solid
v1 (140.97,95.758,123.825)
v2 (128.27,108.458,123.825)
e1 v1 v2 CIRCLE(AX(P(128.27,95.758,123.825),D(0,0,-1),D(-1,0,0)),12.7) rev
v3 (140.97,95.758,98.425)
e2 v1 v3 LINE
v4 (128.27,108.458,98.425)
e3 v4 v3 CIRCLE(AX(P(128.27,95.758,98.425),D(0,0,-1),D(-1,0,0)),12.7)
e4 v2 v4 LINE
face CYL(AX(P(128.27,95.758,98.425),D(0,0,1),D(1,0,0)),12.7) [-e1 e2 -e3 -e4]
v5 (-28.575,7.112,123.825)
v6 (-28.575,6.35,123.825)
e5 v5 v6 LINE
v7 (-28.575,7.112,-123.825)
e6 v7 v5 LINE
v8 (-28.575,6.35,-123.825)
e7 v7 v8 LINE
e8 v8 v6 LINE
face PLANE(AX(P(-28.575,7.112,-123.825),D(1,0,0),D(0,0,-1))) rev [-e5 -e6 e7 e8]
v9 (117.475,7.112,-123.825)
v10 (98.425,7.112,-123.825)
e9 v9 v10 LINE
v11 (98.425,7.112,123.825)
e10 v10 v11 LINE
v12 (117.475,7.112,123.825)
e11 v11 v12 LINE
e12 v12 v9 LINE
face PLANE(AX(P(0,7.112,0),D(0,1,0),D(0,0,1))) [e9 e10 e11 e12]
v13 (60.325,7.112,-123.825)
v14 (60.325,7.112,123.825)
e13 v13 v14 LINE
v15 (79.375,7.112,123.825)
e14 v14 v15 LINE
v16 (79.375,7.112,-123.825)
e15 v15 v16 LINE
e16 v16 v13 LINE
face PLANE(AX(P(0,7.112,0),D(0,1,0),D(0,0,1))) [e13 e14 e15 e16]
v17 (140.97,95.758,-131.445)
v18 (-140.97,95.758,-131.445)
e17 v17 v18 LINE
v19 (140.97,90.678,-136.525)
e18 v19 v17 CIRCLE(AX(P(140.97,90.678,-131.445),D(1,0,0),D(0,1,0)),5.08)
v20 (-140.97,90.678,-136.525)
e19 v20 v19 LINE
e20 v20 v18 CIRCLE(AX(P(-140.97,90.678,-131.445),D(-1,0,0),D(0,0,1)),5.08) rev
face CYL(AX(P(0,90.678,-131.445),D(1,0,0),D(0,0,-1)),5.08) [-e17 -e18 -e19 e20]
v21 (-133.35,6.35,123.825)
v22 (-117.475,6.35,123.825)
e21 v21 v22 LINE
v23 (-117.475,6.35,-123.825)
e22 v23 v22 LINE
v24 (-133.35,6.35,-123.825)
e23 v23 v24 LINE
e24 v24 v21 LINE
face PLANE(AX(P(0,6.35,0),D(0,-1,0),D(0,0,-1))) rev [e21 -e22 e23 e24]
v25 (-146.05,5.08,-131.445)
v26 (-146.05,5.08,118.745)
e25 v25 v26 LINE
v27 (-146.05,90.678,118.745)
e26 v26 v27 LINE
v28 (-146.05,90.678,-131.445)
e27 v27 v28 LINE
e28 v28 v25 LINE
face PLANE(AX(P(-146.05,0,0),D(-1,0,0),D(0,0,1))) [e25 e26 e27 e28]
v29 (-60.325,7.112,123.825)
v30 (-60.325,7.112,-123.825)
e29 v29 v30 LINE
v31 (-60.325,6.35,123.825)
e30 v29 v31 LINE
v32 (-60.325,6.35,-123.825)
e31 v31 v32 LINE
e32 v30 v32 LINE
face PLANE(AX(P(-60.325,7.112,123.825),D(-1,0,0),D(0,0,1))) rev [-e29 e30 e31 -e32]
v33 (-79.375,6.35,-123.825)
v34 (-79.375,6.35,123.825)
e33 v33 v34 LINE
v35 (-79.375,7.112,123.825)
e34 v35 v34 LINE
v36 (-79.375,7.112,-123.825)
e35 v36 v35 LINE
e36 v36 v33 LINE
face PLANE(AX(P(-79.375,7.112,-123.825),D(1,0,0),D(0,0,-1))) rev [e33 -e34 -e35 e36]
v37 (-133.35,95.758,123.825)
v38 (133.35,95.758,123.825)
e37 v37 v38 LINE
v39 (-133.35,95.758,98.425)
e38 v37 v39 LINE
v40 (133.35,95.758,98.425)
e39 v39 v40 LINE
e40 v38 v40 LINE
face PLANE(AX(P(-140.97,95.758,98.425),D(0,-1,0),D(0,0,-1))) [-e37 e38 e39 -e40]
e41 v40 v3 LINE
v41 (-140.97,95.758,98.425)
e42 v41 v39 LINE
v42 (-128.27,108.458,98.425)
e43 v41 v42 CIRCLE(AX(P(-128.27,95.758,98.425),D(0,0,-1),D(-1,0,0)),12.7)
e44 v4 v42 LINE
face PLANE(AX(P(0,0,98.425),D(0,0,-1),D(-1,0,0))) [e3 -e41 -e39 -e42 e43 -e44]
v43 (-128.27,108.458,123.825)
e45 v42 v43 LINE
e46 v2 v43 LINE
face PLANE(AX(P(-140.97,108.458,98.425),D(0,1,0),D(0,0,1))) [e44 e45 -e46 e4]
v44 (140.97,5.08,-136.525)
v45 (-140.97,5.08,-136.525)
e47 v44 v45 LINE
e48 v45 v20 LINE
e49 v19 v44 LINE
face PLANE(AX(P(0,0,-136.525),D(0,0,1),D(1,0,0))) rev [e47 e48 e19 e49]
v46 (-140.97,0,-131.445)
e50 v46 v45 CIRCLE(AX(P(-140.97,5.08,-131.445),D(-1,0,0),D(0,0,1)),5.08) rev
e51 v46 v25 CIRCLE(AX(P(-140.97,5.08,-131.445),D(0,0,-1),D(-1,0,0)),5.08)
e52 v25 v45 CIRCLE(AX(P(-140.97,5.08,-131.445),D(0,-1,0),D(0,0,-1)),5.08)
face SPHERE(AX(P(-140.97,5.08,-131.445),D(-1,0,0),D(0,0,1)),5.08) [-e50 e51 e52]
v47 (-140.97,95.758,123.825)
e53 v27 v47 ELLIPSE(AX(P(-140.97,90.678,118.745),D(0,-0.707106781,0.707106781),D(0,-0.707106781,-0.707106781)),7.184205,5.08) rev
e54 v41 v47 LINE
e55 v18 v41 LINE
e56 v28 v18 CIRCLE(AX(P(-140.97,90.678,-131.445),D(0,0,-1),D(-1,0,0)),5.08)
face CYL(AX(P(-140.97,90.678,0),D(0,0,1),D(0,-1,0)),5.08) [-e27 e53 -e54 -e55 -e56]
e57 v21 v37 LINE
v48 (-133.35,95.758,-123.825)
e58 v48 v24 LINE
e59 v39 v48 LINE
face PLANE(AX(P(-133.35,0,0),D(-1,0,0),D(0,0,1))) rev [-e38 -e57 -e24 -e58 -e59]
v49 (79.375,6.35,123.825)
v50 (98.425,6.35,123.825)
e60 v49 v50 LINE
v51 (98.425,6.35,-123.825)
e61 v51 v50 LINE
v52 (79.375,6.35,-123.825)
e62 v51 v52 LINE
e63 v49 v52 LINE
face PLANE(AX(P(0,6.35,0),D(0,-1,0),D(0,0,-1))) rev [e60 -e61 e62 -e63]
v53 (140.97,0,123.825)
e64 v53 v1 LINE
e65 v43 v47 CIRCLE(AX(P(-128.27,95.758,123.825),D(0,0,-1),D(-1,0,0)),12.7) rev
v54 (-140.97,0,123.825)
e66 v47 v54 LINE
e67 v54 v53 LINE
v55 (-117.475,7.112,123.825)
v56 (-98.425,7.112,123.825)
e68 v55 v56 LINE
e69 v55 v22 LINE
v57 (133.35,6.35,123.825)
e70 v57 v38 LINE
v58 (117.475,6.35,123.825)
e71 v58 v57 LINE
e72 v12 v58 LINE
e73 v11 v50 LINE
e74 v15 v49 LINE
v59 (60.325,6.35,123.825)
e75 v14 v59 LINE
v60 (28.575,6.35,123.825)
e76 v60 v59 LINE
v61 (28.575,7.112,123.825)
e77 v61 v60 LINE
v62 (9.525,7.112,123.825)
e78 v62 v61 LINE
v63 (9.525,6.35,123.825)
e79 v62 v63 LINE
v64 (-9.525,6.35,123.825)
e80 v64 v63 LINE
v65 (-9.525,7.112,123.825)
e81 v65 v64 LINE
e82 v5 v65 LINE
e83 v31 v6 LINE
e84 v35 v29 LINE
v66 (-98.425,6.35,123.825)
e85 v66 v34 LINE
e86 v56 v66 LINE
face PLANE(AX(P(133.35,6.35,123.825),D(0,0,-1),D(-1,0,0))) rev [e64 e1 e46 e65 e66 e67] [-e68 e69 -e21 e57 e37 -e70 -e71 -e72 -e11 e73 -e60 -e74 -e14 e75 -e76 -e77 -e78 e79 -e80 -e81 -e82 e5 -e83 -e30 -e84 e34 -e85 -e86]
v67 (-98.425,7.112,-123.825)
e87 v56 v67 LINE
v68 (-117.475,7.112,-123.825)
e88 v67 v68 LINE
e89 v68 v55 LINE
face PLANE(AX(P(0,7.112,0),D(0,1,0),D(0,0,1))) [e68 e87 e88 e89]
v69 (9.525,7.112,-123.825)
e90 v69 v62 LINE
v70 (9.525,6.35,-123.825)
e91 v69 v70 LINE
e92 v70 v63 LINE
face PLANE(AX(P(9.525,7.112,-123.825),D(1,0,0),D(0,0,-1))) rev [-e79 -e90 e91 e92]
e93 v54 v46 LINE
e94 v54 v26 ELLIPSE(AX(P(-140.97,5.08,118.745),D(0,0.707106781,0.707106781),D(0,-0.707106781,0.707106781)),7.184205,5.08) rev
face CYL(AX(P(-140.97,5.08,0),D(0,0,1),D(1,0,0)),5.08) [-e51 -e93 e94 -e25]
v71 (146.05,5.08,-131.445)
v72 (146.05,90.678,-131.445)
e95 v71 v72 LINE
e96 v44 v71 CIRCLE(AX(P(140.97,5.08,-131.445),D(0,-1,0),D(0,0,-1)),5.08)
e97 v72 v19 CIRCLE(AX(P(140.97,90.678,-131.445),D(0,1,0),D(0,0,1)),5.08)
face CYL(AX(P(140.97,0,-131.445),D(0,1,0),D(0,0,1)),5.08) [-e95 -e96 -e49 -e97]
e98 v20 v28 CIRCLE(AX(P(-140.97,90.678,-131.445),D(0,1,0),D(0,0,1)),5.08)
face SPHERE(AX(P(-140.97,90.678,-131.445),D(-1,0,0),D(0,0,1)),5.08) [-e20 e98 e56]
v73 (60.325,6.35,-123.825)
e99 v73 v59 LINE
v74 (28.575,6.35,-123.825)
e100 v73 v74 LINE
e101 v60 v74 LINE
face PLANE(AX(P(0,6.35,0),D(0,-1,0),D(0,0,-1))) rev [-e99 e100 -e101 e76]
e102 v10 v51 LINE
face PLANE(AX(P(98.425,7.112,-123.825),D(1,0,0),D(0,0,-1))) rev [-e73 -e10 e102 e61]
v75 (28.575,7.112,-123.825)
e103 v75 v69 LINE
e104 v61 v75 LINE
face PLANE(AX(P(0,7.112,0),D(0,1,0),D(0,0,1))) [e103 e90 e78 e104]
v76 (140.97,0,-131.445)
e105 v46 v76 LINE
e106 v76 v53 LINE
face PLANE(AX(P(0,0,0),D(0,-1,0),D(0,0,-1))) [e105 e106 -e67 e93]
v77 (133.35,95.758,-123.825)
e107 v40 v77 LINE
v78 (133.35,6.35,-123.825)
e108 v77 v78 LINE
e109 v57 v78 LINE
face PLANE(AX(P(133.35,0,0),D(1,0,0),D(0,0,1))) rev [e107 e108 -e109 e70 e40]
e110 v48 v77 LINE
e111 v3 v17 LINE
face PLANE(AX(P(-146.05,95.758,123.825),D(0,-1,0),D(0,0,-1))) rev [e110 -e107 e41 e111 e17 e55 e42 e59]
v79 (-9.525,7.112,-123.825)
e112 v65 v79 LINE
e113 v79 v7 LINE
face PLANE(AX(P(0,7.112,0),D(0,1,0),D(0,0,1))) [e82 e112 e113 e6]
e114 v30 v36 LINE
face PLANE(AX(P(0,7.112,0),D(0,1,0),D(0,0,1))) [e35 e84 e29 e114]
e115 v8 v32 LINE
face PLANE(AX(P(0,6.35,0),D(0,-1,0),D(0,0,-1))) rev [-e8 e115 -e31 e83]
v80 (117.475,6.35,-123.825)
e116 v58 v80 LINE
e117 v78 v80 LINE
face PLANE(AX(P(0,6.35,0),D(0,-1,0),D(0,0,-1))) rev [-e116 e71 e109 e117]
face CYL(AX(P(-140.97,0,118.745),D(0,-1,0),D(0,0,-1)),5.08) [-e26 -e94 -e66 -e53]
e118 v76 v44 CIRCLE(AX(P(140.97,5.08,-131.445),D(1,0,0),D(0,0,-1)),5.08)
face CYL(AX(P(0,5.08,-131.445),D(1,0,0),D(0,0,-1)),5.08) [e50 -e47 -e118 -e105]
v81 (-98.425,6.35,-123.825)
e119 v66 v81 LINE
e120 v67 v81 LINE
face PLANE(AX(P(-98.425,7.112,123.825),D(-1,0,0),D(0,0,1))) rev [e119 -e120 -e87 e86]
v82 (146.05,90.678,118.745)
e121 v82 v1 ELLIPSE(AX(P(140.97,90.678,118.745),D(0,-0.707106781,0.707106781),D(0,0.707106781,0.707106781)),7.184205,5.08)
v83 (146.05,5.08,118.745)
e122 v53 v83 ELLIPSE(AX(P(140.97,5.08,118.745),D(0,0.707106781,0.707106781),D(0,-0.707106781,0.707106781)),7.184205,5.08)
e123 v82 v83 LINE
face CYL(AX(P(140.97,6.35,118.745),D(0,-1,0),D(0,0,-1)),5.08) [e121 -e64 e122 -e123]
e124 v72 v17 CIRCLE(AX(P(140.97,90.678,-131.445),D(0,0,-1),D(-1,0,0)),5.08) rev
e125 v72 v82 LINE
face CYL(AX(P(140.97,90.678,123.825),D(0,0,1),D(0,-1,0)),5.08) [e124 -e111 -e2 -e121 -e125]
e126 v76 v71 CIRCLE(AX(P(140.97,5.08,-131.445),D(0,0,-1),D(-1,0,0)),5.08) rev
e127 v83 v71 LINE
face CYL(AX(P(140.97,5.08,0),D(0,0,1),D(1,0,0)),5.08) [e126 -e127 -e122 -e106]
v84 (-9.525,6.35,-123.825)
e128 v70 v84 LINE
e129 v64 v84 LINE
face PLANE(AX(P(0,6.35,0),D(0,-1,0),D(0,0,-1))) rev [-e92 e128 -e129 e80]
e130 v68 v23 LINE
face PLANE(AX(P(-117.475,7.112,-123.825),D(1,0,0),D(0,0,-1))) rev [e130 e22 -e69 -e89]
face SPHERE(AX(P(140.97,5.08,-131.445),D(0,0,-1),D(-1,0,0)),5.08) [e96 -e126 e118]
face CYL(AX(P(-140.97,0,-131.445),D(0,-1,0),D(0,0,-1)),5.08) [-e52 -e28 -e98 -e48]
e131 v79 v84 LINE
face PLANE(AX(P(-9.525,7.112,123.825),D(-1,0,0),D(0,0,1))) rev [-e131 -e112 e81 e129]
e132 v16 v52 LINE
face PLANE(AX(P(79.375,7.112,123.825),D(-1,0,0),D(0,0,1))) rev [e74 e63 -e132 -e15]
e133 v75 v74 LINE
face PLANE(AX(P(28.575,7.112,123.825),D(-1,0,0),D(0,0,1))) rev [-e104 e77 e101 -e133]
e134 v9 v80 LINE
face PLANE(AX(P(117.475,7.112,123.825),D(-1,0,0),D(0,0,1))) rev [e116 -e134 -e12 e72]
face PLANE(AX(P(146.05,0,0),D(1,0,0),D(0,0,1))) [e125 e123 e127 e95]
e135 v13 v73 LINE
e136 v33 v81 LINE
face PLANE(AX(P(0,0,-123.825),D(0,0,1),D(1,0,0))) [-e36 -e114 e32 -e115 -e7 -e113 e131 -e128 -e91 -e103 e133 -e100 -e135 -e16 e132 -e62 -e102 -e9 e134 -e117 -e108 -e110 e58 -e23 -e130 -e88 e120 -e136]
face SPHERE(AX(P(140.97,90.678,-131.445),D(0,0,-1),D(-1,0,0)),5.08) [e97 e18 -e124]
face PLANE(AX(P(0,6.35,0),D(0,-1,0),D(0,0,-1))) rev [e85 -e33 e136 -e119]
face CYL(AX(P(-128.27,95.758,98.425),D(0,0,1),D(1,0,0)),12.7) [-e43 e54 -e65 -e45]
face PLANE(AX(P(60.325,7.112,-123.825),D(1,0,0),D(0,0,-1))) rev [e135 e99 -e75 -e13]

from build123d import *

# Parameters (mm, degrees)
SKETCH1_W           = 266.7
SKETCH1_H           = 247.65
BOSS_EXTRUDE1_DEPTH = 6.35
SKETCH2_W           = 247.65
SKETCH2_H           = 95.758
BOSS_EXTRUDE2_DEPTH = 12.7
SKETCH3_W           = 292.1
SKETCH3_H           = 95.758
BOSS_EXTRUDE3_DEPTH = 12.7
SKETCH4_W           = 19.05
SKETCH4_H           = 247.65
BOSS_EXTRUDE4_DEPTH = 0.762
FILLET1_R           = 5.08
SKETCH6_W           = 281.94
SKETCH6_H           = 12.7
BOSS_EXTRUDE5_DEPTH = 25.4
FILLET2_R           = 12.7


with BuildPart() as part:
    # Sketch1 → Boss-Extrude1 (new body)
    with BuildSketch(Plane(origin=(0, 0, 0), x_dir=(1, 0, 0), z_dir=(0, 1, 0))):
        Rectangle(SKETCH1_W, SKETCH1_H)
    extrude(amount=BOSS_EXTRUDE1_DEPTH)

    # Sketch2 → Boss-Extrude2 (add)
    with BuildSketch(Plane.ZY.offset(133.35)):
        with Locations((0, 47.879)):
            Rectangle(SKETCH2_W, SKETCH2_H)
    boss_extrude2 = extrude(amount=BOSS_EXTRUDE2_DEPTH)

    # Mirror1: Boss-Extrude2 across plane
    add(boss_extrude2.mirror(Plane(origin=(0, 0, 0), x_dir=(0, 0, 1), z_dir=(1, 0, 0))))

    # Sketch3 → Boss-Extrude3 (add)
    with BuildSketch(Plane(origin=(0, 0, -123.825), x_dir=(-1, 0, 0), z_dir=(0, 0, -1))):
        with Locations((0, 47.879)):
            Rectangle(SKETCH3_W, SKETCH3_H)
    extrude(amount=BOSS_EXTRUDE3_DEPTH)

    # Sketch4 → Boss-Extrude4 (add)
    with BuildSketch(Plane(origin=(0, 6.35, 0), x_dir=(1, 0, 0), z_dir=(0, 1, 0))):
        with Locations((-107.95, 0)):
            Rectangle(SKETCH4_W, SKETCH4_H)
        with Locations((-69.85, 0)):
            Rectangle(SKETCH4_W, SKETCH4_H)
        with Locations((-19.05, 0)):
            Rectangle(SKETCH4_W, SKETCH4_H)
        with Locations((19.05, 0)):
            Rectangle(SKETCH4_W, SKETCH4_H)
        with Locations((69.85, 0)):
            Rectangle(SKETCH4_W, SKETCH4_H)
        with Locations((107.95, 0)):
            Rectangle(SKETCH4_W, SKETCH4_H)
    extrude(amount=BOSS_EXTRUDE4_DEPTH)

    # Fillet1
    fillet1_edges = [part.edges().sort_by_distance(p)[0] for p in [
        (-146.05, 0, -6.35),
        (-146.05, 47.879, 123.825),
        (-146.05, 95.758, -6.35),
        (146.05, 0, -6.35),
        (146.05, 95.758, -6.35),
        (146.05, 47.879, 123.825),
        (0, 0, -136.525),
        (-146.05, 47.879, -136.525),
        (0, 95.758, -136.525),
        (146.05, 47.879, -136.525),
    ]]
    fillet(fillet1_edges, radius=FILLET1_R)

    # Sketch6 → Boss-Extrude5 (add)
    with BuildSketch(Plane.XY.offset(123.825)):
        with Locations((0, 102.108)):
            Rectangle(SKETCH6_W, SKETCH6_H)
    extrude(amount=-BOSS_EXTRUDE5_DEPTH)

    # Fillet2
    fillet2_edges = [part.edges().sort_by_distance(p)[0] for p in [
        (140.97, 108.458, 111.125),
        (-140.97, 108.458, 111.125),
    ]]
    fillet(fillet2_edges, radius=FILLET2_R - 0.0001)  # a hair under: the kernel refuses the full size


solid = part.part
